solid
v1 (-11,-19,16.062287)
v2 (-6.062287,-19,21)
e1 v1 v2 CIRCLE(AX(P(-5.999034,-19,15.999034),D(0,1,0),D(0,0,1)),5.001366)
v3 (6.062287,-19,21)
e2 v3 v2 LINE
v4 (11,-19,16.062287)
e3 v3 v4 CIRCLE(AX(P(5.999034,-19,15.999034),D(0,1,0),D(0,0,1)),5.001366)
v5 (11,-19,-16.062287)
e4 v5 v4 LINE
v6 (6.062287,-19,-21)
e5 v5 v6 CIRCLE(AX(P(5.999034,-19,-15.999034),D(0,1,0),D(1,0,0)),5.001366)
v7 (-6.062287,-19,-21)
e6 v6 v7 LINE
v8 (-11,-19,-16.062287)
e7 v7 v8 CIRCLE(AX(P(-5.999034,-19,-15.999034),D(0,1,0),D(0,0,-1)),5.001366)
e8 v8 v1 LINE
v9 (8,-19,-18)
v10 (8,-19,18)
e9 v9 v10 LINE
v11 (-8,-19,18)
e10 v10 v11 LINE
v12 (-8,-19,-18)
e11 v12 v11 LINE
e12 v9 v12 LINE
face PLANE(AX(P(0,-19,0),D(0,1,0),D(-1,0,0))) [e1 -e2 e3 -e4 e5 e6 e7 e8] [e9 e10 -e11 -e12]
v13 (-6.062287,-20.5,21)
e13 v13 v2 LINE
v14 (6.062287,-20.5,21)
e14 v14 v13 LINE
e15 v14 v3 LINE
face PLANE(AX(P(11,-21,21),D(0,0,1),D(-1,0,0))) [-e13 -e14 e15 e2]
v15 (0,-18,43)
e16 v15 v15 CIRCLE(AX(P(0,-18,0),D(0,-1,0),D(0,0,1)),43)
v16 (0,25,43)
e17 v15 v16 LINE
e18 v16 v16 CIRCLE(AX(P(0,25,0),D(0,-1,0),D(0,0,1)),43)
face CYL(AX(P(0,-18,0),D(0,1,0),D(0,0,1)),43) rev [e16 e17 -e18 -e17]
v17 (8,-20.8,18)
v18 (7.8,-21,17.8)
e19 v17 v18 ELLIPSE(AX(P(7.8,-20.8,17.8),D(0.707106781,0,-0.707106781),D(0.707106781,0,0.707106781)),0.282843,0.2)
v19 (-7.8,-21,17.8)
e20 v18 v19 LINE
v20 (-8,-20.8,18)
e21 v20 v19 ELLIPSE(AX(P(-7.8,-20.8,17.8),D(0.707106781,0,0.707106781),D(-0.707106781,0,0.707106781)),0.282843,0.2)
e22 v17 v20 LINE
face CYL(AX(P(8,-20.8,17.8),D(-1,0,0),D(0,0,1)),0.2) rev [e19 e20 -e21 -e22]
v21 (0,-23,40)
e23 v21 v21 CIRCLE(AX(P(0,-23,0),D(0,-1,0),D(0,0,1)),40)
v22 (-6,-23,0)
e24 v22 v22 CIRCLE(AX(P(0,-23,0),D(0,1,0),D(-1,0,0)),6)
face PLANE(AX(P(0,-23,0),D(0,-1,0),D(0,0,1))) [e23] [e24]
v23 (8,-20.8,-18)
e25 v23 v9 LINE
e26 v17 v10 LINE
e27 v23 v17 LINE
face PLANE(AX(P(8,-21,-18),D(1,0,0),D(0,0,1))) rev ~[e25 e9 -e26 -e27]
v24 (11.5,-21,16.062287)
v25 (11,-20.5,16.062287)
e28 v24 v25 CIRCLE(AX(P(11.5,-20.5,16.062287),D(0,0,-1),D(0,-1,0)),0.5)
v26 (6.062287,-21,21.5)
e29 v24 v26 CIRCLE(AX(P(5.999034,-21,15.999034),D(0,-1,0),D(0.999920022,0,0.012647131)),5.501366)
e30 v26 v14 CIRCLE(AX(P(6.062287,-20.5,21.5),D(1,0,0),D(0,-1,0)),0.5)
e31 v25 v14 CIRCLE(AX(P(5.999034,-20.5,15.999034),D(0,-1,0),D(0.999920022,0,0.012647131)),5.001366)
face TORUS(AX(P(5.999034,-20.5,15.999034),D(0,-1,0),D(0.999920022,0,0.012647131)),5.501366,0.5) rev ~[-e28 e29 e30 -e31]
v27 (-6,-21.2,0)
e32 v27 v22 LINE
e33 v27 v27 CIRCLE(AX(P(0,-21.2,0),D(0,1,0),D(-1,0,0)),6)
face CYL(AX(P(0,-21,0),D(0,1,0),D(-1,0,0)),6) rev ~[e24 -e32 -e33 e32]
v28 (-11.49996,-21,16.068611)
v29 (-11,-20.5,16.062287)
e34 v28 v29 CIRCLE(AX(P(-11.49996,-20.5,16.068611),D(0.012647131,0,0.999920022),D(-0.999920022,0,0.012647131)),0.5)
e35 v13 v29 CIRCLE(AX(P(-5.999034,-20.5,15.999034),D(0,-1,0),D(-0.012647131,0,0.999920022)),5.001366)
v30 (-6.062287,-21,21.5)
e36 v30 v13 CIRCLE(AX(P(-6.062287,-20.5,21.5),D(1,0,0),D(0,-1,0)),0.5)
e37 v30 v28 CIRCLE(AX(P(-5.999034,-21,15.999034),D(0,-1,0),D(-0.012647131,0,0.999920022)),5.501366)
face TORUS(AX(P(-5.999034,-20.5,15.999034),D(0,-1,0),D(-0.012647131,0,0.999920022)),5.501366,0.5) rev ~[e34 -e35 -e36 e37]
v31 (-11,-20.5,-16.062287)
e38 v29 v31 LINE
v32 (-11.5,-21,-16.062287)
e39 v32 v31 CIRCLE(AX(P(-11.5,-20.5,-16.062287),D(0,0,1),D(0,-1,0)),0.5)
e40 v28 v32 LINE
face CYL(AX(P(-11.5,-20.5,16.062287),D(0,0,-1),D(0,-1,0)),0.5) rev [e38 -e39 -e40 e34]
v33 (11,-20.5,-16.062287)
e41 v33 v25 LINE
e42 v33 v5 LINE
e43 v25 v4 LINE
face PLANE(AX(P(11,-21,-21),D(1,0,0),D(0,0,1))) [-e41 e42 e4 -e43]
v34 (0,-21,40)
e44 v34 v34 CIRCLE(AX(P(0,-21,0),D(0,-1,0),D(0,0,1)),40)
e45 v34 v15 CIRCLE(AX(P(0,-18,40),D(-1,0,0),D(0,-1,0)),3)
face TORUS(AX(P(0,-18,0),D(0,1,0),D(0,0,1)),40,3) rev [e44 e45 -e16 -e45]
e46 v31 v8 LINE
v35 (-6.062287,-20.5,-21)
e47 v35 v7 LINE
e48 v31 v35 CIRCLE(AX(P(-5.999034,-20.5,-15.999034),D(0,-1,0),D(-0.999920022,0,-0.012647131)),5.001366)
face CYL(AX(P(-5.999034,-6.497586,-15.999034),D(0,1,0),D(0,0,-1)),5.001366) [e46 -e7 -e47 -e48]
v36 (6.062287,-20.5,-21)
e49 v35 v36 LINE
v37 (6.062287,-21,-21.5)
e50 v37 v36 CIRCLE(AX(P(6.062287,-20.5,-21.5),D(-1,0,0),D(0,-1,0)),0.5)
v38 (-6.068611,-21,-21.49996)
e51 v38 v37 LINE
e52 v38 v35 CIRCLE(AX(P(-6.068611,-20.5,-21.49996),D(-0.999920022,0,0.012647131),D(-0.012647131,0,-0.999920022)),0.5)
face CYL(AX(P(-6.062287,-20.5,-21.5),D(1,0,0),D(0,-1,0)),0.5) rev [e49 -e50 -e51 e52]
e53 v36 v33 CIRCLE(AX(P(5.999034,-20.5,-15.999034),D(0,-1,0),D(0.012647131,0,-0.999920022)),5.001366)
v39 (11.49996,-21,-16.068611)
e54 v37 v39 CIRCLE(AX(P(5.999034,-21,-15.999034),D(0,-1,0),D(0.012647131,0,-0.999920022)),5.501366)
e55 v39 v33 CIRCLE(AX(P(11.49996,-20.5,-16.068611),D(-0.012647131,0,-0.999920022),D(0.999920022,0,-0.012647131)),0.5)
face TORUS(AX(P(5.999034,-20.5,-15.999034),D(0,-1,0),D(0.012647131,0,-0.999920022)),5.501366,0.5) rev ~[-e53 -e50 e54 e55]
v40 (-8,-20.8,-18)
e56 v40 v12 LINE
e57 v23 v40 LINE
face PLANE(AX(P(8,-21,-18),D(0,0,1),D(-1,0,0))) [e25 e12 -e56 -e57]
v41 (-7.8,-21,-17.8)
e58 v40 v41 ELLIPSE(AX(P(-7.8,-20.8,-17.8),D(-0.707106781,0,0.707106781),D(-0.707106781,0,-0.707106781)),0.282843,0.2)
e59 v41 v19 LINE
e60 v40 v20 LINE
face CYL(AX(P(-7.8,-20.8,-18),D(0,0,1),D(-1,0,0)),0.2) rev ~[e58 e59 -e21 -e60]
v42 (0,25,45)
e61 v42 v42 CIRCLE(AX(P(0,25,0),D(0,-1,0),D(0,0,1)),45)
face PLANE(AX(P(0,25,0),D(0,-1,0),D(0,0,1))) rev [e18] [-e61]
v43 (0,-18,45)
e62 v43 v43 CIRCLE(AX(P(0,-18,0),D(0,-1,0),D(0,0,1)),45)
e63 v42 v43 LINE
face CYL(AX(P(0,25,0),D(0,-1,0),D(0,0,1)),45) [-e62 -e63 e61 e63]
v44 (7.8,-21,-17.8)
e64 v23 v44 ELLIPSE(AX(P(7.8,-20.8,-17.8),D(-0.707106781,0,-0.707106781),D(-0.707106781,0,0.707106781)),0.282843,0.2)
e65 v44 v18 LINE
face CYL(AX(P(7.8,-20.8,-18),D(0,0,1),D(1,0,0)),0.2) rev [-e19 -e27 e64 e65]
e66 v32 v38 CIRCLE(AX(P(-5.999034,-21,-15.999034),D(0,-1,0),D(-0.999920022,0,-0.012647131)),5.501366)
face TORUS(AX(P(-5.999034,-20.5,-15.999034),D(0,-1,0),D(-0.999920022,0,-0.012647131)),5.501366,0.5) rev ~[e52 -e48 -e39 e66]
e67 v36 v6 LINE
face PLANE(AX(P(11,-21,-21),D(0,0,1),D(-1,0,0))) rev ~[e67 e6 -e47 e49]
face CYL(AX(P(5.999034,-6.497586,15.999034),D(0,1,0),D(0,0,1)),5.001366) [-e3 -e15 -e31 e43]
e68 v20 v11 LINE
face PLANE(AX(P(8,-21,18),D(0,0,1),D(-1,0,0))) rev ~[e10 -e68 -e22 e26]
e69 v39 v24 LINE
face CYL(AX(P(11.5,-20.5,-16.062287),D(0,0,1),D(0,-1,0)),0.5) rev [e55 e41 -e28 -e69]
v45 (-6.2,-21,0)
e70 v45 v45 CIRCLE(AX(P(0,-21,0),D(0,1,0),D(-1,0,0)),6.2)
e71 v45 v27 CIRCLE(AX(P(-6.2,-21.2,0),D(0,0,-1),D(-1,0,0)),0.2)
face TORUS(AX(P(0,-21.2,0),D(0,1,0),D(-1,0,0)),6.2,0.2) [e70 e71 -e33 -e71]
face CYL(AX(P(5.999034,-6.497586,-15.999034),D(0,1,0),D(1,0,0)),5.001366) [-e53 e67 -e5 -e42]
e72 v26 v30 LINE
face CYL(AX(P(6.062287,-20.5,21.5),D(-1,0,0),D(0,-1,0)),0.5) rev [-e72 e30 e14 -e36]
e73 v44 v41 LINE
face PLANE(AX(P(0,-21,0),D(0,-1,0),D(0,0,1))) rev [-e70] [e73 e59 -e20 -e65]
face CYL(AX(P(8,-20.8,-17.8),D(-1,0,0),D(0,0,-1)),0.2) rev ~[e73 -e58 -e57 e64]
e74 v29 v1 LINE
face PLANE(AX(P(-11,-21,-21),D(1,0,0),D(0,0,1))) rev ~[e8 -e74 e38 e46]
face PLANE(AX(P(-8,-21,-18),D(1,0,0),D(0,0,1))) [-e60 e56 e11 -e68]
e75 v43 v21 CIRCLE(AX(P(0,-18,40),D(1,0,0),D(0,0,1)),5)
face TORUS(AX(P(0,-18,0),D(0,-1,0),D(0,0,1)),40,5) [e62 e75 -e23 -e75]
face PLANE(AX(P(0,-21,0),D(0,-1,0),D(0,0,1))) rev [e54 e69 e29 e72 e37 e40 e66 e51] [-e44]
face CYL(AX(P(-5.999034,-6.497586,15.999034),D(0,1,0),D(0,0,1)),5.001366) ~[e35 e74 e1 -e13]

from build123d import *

# Parameters (mm, degrees)
F2_W        = 22
F2_H        = 42
F2_W_2      = 16
F2_H_2      = 36
F3_DEPTH    = 2
F2_R        = 6
F4_DEPTH    = 25
F5_T1_DEPTH = 14.5024142536
F6_R        = 0.5
F7_R        = 0.2


# Not quite as in the source:
# - a fillet or chamfer that OpenCascade refuses, or shapes differently, is made with other operations: its cross-section is extruded or revolved along the edge and cut away or added


with BuildPart() as f1:
    # F0 (on Right) → F1 (revolve)
    with BuildSketch(Plane.YZ):
        with BuildLine():
            Line((-23, 0), (-21, 0))
            Line((-21, 0), (-21, 32.1))
            Line((-21, 32.1), (-21, 34.1))
            Line((-21, 34.1), (-21, 40))
            ThreePointArc((-21, 40), (-20.1213203436, 42.1213203436), (-18, 43))
            Line((-18, 43), (15, 43))
            Line((15, 43), (17, 43))
            Line((17, 43), (23, 43))
            Line((23, 43), (25, 43))
            Line((25, 43), (25, 45))
            Line((25, 45), (-18, 45))
            ThreePointArc((-18, 45), (-21.5355339059, 43.5355339059), (-23, 40))
            Line((-23, 40), (-23, 0))
        make_face()
    revolve(axis=Axis((0, -22, 0), (0, -1, 0)))

    # F2 (on face) → F3 (join)
    with BuildSketch(Plane(origin=(0, -21, 0), x_dir=(-1, 0, 0), z_dir=(0, 1, 0))):
        Rectangle(F2_W, F2_H)
        Rectangle(F2_W_2, F2_H_2, mode=Mode.SUBTRACT)
    extrude(amount=F3_DEPTH)

    # F2 (on face) → F4 (cut)
    with BuildSketch(Plane(origin=(0, -21, 0), x_dir=(-1, 0, 0), z_dir=(0, 1, 0))):
        Circle(F2_R)
    extrude(amount=-F4_DEPTH, mode=Mode.SUBTRACT)

    # F5: fillet of radius 5 on 4 edges, made by hand

    # F5_s2 → F5_t1 (cut)
    with BuildSketch(Plane.XZ.offset(6.4975857464)):
        with BuildLine():
            ThreePointArc((5.9990343146, 21.0004), (9.5355339059, 19.5355339059), (11.0004, 15.9990343146))
            Line((11.0004, 15.9990343146), (11.5005365685, 15.9990343146))
            ThreePointArc((11.5005365685, 15.9990343146), (11.5001365685, 18.4995171573), (11.5001365685, 21))
            Line((11.5001365685, 21), (11, 21.5001365685))
            ThreePointArc((11, 21.5001365685), (8.4995171573, 21.5001365685), (5.9990343146, 21.5005365685))
            Line((5.9990343146, 21.5005365685), (5.9990343146, 21.0004))
        make_face()
        with BuildLine():
            ThreePointArc((-5.9990343146, 21.0004), (-9.5355339059, 19.5355339059), (-11.0004, 15.9990343146))
            Line((-11.0004, 15.9990343146), (-11.5005365685, 15.9990343146))
            ThreePointArc((-11.5005365685, 15.9990343146), (-11.5001365685, 18.4995171573), (-11.5001365685, 21))
            Line((-11.5001365685, 21), (-11, 21.5001365685))
            ThreePointArc((-11, 21.5001365685), (-8.4995171573, 21.5001365685), (-5.9990343146, 21.5005365685))
            Line((-5.9990343146, 21.5005365685), (-5.9990343146, 21.0004))
        make_face()
        with BuildLine():
            ThreePointArc((-5.9990343146, -21.0004), (-9.5355339059, -19.5355339059), (-11.0004, -15.9990343146))
            Line((-11.0004, -15.9990343146), (-11.5005365685, -15.9990343146))
            ThreePointArc((-11.5005365685, -15.9990343146), (-11.5001365685, -18.4995171573), (-11.5001365685, -21))
            Line((-11.5001365685, -21), (-11, -21.5001365685))
            ThreePointArc((-11, -21.5001365685), (-8.4995171573, -21.5001365685), (-5.9990343146, -21.5005365685))
            Line((-5.9990343146, -21.5005365685), (-5.9990343146, -21.0004))
        make_face()
        with BuildLine():
            ThreePointArc((11.0004, -15.9990343146), (9.5355339059, -19.5355339059), (5.9990343146, -21.0004))
            Line((5.9990343146, -21.0004), (5.9990343146, -21.5005365685))
            ThreePointArc((5.9990343146, -21.5005365685), (8.4995171573, -21.5001365685), (11, -21.5001365685))
            Line((11, -21.5001365685), (11.5001365685, -21))
            ThreePointArc((11.5001365685, -21), (11.5001365685, -18.4995171573), (11.5005365685, -15.9990343146))
            Line((11.5005365685, -15.9990343146), (11.0004, -15.9990343146))
        make_face()
    extrude(amount=F5_T1_DEPTH, mode=Mode.SUBTRACT)

    # F6
    f6_edges = [f1.edges().sort_by_distance(p)[0] for p in [
        (0, -21, -40),
        (0, -21, 21),
        (-9.535534, -21, 19.535534),
        (-11, -21, 0),
        (-9.535534, -21, -19.535534),
        (0, -21, -21),
        (9.535534, -21, -19.535534),
        (11, -21, 0),
        (9.535534, -21, 19.535534),
    ]]
    fillet(f6_edges, radius=F6_R)

    # F7
    f7_edges = [f1.edges().sort_by_distance(p)[0] for p in [
        (8, -21, 0),
        (0, -21, -18),
        (0, -21, 18),
        (-8, -21, 0),
        (6, -21, 0),
        (0, -21, -40),
    ]]
    fillet(f7_edges, radius=F7_R)


solid = f1.part
